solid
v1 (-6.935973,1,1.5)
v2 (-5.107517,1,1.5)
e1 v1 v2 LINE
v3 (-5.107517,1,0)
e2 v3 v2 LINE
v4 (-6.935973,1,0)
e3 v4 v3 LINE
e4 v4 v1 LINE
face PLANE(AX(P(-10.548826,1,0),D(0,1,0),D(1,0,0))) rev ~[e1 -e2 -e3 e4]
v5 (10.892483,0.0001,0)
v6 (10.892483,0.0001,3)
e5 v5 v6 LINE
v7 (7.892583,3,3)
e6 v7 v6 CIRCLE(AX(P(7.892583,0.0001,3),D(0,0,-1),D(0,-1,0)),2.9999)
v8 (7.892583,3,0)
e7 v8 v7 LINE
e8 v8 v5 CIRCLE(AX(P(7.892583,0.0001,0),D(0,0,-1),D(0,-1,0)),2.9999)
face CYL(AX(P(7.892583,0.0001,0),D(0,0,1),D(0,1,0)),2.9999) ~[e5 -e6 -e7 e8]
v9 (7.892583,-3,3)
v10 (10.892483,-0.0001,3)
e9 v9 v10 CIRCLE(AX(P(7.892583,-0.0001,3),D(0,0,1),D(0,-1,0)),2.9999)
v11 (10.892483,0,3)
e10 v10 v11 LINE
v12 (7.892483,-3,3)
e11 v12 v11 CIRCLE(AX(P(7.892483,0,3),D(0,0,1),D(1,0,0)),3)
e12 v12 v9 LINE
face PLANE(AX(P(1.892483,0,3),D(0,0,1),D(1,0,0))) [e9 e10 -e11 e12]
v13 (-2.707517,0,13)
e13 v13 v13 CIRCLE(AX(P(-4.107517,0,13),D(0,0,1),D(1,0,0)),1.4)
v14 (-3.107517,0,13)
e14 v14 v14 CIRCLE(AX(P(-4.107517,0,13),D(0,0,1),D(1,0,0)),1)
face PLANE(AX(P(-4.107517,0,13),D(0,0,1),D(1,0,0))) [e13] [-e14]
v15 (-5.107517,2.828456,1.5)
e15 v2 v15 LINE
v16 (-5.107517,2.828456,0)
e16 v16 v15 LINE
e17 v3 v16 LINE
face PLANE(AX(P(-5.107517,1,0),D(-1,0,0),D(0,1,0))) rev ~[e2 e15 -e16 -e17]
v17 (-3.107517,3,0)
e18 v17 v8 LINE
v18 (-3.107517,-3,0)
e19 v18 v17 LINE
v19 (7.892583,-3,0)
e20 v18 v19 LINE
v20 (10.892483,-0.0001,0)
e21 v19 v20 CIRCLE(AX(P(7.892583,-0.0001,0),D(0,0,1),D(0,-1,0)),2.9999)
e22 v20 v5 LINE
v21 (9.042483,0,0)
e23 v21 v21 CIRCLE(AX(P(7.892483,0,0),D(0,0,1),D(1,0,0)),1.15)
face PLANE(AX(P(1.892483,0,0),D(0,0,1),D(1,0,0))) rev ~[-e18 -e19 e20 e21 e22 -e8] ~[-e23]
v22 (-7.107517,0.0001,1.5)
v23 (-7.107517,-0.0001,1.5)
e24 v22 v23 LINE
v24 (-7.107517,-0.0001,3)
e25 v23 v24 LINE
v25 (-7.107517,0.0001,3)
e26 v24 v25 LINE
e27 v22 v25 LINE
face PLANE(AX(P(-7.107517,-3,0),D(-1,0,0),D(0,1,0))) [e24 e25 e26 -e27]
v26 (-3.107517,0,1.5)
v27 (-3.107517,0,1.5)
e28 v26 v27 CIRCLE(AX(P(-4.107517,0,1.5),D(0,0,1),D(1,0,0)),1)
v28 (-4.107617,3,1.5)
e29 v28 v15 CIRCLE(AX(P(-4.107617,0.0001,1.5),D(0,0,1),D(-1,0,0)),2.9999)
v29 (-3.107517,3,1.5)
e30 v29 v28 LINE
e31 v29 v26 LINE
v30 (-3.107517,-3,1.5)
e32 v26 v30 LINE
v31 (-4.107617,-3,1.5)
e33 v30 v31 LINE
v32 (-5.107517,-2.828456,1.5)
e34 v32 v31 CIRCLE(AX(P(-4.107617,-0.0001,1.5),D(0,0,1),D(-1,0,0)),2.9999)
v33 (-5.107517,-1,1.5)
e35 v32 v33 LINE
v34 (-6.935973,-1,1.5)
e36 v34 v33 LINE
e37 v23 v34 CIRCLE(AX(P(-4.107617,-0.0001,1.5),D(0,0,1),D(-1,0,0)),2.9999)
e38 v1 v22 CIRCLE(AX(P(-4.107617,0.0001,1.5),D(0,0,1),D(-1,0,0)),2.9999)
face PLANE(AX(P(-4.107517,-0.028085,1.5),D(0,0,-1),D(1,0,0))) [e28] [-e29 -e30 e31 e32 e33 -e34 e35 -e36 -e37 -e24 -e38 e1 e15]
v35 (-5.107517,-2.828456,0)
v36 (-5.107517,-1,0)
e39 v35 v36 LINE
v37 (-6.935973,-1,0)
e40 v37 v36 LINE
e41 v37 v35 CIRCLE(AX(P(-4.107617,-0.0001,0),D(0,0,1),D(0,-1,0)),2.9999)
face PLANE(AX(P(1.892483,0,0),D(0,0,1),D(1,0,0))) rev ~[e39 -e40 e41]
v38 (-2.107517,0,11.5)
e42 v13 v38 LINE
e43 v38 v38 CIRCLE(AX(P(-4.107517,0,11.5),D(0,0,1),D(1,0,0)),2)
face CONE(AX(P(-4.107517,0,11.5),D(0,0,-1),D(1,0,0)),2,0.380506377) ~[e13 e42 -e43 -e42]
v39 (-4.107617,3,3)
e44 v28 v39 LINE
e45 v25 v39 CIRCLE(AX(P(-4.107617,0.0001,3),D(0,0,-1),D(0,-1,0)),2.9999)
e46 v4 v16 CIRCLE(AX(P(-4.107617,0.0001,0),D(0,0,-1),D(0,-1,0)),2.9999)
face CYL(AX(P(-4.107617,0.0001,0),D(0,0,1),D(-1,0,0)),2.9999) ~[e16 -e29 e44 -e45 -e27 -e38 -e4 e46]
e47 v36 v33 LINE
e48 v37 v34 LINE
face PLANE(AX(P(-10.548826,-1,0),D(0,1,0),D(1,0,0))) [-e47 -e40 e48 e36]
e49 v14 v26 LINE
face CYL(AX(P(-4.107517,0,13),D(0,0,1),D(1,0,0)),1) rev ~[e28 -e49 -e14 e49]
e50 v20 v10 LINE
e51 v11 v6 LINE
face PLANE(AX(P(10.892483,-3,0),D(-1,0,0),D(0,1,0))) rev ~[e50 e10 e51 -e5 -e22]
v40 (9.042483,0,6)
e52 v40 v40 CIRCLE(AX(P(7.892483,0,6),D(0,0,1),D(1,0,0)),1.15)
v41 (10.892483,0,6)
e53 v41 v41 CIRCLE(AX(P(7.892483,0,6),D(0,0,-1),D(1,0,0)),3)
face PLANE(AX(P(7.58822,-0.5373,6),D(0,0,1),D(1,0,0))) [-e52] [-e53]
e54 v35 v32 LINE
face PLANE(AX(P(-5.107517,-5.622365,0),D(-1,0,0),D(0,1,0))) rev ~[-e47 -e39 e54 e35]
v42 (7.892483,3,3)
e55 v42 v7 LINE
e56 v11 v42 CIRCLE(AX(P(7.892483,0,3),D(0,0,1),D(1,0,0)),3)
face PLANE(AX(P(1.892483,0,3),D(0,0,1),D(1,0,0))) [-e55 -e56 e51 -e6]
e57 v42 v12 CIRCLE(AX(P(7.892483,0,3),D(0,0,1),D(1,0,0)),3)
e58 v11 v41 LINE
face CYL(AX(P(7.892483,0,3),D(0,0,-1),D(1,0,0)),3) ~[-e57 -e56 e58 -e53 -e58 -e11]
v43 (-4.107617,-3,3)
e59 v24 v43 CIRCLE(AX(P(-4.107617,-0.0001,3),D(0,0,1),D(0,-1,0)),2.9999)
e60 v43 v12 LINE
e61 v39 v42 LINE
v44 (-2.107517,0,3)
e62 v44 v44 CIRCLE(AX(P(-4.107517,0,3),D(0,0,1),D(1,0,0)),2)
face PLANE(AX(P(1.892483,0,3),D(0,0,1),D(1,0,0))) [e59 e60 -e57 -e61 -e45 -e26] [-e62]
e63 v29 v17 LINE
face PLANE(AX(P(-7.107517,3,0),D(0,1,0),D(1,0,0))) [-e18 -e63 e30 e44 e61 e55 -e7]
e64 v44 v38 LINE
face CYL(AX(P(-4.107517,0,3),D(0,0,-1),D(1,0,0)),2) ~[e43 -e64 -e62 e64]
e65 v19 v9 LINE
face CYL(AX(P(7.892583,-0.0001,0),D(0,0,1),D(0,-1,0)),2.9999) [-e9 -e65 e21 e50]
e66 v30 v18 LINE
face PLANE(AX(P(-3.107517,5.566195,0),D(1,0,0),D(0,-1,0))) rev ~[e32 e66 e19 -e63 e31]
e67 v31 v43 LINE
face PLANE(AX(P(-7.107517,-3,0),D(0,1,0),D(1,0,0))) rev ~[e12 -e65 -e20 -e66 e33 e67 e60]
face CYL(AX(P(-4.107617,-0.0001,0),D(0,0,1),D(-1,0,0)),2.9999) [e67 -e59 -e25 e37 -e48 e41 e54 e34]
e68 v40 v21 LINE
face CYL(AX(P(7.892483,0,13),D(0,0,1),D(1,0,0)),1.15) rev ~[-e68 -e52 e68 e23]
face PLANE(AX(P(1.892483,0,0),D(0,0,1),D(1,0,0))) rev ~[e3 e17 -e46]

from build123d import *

# Parameters (mm, degrees)
F0_W      = 18
F0_H      = 6
F1_DEPTH  = 3
F2_R      = 3
F2_R_2    = 2
F3_DEPTH  = 10
F4_R      = 1
F4_R_2    = 1.15
F5_DEPTH  = 20
F6_SIZE2  = 1.5
F6_SIZE   = 0.6
F7_W      = 11.6012076614
F7_H      = 11.8295210414
F8_DEPTH  = 7
F9_R      = 2.9999
F10_W     = 5.4413094251
F10_H     = 2
F11_DEPTH = 1.5


# Not quite as in the source:
# - a fillet or chamfer is up to 0.001 mm smaller than in the source, because OpenCascade refuses the exact size


with BuildPart() as f1:
    # F0 (on Top) → F1 (new body)
    with BuildSketch(Plane.XY):
        with Locations((1.8924829921, 0)):
            Rectangle(F0_W, F0_H)
    extrude(amount=F1_DEPTH)

    # F2 (on face) → F3 (join)
    with BuildSketch(Plane.XY.offset(3)):
        with Locations((7.8924829921, 0)):
            Circle(F2_R)
        with Locations((-4.1075170079, 0)):
            Circle(F2_R_2)
    extrude(amount=F3_DEPTH)

    # F4 (on face) → F5 (cut)
    with BuildSketch(Plane.XY.offset(13)):
        with Locations((-4.1075170079, 0)):
            Circle(F4_R)
        with Locations((7.8924829921, 0)):
            Circle(F4_R_2)
    extrude(amount=-F5_DEPTH, mode=Mode.SUBTRACT)

    # F6
    f6_edges = [f1.edges().sort_by_distance(p)[0] for p in [
        (-6.107517, 0, 13),
    ]]
    f6_side = f1.faces().sort_by_distance((-6.050948, 0, 13))[0]
    chamfer(f6_edges, length=F6_SIZE, length2=F6_SIZE2, reference=f6_side)

    # F7 (on face) → F8 (cut)
    with BuildSketch(Plane.XY.offset(13)):
        with Locations((7.5882198871, -0.5373002496)):
            Rectangle(F7_W, F7_H)
    extrude(amount=-F8_DEPTH, mode=Mode.SUBTRACT)

    # F9 (radius 3 in the source; OpenCascade refuses exactly that, so slightly less here)
    f9_edges = [f1.edges().sort_by_distance(p)[0] for p in [
        (10.892483, -3, 1.5),
        (10.892483, 3, 1.5),
        (-7.107517, 3, 1.5),
        (-7.107517, -3, 1.5),
    ]]
    fillet(f9_edges, radius=F9_R)

    # F10 (on face) → F11 (cut)
    with BuildSketch(Plane(origin=(0, 0, 0), x_dir=(1, 0, 0), z_dir=(0, 0, -1))):
        Polygon((-3.1075170079, 5.622364855), (-5.1075170079, 5.622364855), (-5.1075170079, 1), (-5.1075170079, -1), (-5.1075170079, -5.5661949279), (-3.1075170079, -5.5661949279), align=None)
        with Locations((-7.8281717205, 0)):
            Rectangle(F10_W, F10_H)
    extrude(amount=-F11_DEPTH, mode=Mode.SUBTRACT)


solid = f1.part
